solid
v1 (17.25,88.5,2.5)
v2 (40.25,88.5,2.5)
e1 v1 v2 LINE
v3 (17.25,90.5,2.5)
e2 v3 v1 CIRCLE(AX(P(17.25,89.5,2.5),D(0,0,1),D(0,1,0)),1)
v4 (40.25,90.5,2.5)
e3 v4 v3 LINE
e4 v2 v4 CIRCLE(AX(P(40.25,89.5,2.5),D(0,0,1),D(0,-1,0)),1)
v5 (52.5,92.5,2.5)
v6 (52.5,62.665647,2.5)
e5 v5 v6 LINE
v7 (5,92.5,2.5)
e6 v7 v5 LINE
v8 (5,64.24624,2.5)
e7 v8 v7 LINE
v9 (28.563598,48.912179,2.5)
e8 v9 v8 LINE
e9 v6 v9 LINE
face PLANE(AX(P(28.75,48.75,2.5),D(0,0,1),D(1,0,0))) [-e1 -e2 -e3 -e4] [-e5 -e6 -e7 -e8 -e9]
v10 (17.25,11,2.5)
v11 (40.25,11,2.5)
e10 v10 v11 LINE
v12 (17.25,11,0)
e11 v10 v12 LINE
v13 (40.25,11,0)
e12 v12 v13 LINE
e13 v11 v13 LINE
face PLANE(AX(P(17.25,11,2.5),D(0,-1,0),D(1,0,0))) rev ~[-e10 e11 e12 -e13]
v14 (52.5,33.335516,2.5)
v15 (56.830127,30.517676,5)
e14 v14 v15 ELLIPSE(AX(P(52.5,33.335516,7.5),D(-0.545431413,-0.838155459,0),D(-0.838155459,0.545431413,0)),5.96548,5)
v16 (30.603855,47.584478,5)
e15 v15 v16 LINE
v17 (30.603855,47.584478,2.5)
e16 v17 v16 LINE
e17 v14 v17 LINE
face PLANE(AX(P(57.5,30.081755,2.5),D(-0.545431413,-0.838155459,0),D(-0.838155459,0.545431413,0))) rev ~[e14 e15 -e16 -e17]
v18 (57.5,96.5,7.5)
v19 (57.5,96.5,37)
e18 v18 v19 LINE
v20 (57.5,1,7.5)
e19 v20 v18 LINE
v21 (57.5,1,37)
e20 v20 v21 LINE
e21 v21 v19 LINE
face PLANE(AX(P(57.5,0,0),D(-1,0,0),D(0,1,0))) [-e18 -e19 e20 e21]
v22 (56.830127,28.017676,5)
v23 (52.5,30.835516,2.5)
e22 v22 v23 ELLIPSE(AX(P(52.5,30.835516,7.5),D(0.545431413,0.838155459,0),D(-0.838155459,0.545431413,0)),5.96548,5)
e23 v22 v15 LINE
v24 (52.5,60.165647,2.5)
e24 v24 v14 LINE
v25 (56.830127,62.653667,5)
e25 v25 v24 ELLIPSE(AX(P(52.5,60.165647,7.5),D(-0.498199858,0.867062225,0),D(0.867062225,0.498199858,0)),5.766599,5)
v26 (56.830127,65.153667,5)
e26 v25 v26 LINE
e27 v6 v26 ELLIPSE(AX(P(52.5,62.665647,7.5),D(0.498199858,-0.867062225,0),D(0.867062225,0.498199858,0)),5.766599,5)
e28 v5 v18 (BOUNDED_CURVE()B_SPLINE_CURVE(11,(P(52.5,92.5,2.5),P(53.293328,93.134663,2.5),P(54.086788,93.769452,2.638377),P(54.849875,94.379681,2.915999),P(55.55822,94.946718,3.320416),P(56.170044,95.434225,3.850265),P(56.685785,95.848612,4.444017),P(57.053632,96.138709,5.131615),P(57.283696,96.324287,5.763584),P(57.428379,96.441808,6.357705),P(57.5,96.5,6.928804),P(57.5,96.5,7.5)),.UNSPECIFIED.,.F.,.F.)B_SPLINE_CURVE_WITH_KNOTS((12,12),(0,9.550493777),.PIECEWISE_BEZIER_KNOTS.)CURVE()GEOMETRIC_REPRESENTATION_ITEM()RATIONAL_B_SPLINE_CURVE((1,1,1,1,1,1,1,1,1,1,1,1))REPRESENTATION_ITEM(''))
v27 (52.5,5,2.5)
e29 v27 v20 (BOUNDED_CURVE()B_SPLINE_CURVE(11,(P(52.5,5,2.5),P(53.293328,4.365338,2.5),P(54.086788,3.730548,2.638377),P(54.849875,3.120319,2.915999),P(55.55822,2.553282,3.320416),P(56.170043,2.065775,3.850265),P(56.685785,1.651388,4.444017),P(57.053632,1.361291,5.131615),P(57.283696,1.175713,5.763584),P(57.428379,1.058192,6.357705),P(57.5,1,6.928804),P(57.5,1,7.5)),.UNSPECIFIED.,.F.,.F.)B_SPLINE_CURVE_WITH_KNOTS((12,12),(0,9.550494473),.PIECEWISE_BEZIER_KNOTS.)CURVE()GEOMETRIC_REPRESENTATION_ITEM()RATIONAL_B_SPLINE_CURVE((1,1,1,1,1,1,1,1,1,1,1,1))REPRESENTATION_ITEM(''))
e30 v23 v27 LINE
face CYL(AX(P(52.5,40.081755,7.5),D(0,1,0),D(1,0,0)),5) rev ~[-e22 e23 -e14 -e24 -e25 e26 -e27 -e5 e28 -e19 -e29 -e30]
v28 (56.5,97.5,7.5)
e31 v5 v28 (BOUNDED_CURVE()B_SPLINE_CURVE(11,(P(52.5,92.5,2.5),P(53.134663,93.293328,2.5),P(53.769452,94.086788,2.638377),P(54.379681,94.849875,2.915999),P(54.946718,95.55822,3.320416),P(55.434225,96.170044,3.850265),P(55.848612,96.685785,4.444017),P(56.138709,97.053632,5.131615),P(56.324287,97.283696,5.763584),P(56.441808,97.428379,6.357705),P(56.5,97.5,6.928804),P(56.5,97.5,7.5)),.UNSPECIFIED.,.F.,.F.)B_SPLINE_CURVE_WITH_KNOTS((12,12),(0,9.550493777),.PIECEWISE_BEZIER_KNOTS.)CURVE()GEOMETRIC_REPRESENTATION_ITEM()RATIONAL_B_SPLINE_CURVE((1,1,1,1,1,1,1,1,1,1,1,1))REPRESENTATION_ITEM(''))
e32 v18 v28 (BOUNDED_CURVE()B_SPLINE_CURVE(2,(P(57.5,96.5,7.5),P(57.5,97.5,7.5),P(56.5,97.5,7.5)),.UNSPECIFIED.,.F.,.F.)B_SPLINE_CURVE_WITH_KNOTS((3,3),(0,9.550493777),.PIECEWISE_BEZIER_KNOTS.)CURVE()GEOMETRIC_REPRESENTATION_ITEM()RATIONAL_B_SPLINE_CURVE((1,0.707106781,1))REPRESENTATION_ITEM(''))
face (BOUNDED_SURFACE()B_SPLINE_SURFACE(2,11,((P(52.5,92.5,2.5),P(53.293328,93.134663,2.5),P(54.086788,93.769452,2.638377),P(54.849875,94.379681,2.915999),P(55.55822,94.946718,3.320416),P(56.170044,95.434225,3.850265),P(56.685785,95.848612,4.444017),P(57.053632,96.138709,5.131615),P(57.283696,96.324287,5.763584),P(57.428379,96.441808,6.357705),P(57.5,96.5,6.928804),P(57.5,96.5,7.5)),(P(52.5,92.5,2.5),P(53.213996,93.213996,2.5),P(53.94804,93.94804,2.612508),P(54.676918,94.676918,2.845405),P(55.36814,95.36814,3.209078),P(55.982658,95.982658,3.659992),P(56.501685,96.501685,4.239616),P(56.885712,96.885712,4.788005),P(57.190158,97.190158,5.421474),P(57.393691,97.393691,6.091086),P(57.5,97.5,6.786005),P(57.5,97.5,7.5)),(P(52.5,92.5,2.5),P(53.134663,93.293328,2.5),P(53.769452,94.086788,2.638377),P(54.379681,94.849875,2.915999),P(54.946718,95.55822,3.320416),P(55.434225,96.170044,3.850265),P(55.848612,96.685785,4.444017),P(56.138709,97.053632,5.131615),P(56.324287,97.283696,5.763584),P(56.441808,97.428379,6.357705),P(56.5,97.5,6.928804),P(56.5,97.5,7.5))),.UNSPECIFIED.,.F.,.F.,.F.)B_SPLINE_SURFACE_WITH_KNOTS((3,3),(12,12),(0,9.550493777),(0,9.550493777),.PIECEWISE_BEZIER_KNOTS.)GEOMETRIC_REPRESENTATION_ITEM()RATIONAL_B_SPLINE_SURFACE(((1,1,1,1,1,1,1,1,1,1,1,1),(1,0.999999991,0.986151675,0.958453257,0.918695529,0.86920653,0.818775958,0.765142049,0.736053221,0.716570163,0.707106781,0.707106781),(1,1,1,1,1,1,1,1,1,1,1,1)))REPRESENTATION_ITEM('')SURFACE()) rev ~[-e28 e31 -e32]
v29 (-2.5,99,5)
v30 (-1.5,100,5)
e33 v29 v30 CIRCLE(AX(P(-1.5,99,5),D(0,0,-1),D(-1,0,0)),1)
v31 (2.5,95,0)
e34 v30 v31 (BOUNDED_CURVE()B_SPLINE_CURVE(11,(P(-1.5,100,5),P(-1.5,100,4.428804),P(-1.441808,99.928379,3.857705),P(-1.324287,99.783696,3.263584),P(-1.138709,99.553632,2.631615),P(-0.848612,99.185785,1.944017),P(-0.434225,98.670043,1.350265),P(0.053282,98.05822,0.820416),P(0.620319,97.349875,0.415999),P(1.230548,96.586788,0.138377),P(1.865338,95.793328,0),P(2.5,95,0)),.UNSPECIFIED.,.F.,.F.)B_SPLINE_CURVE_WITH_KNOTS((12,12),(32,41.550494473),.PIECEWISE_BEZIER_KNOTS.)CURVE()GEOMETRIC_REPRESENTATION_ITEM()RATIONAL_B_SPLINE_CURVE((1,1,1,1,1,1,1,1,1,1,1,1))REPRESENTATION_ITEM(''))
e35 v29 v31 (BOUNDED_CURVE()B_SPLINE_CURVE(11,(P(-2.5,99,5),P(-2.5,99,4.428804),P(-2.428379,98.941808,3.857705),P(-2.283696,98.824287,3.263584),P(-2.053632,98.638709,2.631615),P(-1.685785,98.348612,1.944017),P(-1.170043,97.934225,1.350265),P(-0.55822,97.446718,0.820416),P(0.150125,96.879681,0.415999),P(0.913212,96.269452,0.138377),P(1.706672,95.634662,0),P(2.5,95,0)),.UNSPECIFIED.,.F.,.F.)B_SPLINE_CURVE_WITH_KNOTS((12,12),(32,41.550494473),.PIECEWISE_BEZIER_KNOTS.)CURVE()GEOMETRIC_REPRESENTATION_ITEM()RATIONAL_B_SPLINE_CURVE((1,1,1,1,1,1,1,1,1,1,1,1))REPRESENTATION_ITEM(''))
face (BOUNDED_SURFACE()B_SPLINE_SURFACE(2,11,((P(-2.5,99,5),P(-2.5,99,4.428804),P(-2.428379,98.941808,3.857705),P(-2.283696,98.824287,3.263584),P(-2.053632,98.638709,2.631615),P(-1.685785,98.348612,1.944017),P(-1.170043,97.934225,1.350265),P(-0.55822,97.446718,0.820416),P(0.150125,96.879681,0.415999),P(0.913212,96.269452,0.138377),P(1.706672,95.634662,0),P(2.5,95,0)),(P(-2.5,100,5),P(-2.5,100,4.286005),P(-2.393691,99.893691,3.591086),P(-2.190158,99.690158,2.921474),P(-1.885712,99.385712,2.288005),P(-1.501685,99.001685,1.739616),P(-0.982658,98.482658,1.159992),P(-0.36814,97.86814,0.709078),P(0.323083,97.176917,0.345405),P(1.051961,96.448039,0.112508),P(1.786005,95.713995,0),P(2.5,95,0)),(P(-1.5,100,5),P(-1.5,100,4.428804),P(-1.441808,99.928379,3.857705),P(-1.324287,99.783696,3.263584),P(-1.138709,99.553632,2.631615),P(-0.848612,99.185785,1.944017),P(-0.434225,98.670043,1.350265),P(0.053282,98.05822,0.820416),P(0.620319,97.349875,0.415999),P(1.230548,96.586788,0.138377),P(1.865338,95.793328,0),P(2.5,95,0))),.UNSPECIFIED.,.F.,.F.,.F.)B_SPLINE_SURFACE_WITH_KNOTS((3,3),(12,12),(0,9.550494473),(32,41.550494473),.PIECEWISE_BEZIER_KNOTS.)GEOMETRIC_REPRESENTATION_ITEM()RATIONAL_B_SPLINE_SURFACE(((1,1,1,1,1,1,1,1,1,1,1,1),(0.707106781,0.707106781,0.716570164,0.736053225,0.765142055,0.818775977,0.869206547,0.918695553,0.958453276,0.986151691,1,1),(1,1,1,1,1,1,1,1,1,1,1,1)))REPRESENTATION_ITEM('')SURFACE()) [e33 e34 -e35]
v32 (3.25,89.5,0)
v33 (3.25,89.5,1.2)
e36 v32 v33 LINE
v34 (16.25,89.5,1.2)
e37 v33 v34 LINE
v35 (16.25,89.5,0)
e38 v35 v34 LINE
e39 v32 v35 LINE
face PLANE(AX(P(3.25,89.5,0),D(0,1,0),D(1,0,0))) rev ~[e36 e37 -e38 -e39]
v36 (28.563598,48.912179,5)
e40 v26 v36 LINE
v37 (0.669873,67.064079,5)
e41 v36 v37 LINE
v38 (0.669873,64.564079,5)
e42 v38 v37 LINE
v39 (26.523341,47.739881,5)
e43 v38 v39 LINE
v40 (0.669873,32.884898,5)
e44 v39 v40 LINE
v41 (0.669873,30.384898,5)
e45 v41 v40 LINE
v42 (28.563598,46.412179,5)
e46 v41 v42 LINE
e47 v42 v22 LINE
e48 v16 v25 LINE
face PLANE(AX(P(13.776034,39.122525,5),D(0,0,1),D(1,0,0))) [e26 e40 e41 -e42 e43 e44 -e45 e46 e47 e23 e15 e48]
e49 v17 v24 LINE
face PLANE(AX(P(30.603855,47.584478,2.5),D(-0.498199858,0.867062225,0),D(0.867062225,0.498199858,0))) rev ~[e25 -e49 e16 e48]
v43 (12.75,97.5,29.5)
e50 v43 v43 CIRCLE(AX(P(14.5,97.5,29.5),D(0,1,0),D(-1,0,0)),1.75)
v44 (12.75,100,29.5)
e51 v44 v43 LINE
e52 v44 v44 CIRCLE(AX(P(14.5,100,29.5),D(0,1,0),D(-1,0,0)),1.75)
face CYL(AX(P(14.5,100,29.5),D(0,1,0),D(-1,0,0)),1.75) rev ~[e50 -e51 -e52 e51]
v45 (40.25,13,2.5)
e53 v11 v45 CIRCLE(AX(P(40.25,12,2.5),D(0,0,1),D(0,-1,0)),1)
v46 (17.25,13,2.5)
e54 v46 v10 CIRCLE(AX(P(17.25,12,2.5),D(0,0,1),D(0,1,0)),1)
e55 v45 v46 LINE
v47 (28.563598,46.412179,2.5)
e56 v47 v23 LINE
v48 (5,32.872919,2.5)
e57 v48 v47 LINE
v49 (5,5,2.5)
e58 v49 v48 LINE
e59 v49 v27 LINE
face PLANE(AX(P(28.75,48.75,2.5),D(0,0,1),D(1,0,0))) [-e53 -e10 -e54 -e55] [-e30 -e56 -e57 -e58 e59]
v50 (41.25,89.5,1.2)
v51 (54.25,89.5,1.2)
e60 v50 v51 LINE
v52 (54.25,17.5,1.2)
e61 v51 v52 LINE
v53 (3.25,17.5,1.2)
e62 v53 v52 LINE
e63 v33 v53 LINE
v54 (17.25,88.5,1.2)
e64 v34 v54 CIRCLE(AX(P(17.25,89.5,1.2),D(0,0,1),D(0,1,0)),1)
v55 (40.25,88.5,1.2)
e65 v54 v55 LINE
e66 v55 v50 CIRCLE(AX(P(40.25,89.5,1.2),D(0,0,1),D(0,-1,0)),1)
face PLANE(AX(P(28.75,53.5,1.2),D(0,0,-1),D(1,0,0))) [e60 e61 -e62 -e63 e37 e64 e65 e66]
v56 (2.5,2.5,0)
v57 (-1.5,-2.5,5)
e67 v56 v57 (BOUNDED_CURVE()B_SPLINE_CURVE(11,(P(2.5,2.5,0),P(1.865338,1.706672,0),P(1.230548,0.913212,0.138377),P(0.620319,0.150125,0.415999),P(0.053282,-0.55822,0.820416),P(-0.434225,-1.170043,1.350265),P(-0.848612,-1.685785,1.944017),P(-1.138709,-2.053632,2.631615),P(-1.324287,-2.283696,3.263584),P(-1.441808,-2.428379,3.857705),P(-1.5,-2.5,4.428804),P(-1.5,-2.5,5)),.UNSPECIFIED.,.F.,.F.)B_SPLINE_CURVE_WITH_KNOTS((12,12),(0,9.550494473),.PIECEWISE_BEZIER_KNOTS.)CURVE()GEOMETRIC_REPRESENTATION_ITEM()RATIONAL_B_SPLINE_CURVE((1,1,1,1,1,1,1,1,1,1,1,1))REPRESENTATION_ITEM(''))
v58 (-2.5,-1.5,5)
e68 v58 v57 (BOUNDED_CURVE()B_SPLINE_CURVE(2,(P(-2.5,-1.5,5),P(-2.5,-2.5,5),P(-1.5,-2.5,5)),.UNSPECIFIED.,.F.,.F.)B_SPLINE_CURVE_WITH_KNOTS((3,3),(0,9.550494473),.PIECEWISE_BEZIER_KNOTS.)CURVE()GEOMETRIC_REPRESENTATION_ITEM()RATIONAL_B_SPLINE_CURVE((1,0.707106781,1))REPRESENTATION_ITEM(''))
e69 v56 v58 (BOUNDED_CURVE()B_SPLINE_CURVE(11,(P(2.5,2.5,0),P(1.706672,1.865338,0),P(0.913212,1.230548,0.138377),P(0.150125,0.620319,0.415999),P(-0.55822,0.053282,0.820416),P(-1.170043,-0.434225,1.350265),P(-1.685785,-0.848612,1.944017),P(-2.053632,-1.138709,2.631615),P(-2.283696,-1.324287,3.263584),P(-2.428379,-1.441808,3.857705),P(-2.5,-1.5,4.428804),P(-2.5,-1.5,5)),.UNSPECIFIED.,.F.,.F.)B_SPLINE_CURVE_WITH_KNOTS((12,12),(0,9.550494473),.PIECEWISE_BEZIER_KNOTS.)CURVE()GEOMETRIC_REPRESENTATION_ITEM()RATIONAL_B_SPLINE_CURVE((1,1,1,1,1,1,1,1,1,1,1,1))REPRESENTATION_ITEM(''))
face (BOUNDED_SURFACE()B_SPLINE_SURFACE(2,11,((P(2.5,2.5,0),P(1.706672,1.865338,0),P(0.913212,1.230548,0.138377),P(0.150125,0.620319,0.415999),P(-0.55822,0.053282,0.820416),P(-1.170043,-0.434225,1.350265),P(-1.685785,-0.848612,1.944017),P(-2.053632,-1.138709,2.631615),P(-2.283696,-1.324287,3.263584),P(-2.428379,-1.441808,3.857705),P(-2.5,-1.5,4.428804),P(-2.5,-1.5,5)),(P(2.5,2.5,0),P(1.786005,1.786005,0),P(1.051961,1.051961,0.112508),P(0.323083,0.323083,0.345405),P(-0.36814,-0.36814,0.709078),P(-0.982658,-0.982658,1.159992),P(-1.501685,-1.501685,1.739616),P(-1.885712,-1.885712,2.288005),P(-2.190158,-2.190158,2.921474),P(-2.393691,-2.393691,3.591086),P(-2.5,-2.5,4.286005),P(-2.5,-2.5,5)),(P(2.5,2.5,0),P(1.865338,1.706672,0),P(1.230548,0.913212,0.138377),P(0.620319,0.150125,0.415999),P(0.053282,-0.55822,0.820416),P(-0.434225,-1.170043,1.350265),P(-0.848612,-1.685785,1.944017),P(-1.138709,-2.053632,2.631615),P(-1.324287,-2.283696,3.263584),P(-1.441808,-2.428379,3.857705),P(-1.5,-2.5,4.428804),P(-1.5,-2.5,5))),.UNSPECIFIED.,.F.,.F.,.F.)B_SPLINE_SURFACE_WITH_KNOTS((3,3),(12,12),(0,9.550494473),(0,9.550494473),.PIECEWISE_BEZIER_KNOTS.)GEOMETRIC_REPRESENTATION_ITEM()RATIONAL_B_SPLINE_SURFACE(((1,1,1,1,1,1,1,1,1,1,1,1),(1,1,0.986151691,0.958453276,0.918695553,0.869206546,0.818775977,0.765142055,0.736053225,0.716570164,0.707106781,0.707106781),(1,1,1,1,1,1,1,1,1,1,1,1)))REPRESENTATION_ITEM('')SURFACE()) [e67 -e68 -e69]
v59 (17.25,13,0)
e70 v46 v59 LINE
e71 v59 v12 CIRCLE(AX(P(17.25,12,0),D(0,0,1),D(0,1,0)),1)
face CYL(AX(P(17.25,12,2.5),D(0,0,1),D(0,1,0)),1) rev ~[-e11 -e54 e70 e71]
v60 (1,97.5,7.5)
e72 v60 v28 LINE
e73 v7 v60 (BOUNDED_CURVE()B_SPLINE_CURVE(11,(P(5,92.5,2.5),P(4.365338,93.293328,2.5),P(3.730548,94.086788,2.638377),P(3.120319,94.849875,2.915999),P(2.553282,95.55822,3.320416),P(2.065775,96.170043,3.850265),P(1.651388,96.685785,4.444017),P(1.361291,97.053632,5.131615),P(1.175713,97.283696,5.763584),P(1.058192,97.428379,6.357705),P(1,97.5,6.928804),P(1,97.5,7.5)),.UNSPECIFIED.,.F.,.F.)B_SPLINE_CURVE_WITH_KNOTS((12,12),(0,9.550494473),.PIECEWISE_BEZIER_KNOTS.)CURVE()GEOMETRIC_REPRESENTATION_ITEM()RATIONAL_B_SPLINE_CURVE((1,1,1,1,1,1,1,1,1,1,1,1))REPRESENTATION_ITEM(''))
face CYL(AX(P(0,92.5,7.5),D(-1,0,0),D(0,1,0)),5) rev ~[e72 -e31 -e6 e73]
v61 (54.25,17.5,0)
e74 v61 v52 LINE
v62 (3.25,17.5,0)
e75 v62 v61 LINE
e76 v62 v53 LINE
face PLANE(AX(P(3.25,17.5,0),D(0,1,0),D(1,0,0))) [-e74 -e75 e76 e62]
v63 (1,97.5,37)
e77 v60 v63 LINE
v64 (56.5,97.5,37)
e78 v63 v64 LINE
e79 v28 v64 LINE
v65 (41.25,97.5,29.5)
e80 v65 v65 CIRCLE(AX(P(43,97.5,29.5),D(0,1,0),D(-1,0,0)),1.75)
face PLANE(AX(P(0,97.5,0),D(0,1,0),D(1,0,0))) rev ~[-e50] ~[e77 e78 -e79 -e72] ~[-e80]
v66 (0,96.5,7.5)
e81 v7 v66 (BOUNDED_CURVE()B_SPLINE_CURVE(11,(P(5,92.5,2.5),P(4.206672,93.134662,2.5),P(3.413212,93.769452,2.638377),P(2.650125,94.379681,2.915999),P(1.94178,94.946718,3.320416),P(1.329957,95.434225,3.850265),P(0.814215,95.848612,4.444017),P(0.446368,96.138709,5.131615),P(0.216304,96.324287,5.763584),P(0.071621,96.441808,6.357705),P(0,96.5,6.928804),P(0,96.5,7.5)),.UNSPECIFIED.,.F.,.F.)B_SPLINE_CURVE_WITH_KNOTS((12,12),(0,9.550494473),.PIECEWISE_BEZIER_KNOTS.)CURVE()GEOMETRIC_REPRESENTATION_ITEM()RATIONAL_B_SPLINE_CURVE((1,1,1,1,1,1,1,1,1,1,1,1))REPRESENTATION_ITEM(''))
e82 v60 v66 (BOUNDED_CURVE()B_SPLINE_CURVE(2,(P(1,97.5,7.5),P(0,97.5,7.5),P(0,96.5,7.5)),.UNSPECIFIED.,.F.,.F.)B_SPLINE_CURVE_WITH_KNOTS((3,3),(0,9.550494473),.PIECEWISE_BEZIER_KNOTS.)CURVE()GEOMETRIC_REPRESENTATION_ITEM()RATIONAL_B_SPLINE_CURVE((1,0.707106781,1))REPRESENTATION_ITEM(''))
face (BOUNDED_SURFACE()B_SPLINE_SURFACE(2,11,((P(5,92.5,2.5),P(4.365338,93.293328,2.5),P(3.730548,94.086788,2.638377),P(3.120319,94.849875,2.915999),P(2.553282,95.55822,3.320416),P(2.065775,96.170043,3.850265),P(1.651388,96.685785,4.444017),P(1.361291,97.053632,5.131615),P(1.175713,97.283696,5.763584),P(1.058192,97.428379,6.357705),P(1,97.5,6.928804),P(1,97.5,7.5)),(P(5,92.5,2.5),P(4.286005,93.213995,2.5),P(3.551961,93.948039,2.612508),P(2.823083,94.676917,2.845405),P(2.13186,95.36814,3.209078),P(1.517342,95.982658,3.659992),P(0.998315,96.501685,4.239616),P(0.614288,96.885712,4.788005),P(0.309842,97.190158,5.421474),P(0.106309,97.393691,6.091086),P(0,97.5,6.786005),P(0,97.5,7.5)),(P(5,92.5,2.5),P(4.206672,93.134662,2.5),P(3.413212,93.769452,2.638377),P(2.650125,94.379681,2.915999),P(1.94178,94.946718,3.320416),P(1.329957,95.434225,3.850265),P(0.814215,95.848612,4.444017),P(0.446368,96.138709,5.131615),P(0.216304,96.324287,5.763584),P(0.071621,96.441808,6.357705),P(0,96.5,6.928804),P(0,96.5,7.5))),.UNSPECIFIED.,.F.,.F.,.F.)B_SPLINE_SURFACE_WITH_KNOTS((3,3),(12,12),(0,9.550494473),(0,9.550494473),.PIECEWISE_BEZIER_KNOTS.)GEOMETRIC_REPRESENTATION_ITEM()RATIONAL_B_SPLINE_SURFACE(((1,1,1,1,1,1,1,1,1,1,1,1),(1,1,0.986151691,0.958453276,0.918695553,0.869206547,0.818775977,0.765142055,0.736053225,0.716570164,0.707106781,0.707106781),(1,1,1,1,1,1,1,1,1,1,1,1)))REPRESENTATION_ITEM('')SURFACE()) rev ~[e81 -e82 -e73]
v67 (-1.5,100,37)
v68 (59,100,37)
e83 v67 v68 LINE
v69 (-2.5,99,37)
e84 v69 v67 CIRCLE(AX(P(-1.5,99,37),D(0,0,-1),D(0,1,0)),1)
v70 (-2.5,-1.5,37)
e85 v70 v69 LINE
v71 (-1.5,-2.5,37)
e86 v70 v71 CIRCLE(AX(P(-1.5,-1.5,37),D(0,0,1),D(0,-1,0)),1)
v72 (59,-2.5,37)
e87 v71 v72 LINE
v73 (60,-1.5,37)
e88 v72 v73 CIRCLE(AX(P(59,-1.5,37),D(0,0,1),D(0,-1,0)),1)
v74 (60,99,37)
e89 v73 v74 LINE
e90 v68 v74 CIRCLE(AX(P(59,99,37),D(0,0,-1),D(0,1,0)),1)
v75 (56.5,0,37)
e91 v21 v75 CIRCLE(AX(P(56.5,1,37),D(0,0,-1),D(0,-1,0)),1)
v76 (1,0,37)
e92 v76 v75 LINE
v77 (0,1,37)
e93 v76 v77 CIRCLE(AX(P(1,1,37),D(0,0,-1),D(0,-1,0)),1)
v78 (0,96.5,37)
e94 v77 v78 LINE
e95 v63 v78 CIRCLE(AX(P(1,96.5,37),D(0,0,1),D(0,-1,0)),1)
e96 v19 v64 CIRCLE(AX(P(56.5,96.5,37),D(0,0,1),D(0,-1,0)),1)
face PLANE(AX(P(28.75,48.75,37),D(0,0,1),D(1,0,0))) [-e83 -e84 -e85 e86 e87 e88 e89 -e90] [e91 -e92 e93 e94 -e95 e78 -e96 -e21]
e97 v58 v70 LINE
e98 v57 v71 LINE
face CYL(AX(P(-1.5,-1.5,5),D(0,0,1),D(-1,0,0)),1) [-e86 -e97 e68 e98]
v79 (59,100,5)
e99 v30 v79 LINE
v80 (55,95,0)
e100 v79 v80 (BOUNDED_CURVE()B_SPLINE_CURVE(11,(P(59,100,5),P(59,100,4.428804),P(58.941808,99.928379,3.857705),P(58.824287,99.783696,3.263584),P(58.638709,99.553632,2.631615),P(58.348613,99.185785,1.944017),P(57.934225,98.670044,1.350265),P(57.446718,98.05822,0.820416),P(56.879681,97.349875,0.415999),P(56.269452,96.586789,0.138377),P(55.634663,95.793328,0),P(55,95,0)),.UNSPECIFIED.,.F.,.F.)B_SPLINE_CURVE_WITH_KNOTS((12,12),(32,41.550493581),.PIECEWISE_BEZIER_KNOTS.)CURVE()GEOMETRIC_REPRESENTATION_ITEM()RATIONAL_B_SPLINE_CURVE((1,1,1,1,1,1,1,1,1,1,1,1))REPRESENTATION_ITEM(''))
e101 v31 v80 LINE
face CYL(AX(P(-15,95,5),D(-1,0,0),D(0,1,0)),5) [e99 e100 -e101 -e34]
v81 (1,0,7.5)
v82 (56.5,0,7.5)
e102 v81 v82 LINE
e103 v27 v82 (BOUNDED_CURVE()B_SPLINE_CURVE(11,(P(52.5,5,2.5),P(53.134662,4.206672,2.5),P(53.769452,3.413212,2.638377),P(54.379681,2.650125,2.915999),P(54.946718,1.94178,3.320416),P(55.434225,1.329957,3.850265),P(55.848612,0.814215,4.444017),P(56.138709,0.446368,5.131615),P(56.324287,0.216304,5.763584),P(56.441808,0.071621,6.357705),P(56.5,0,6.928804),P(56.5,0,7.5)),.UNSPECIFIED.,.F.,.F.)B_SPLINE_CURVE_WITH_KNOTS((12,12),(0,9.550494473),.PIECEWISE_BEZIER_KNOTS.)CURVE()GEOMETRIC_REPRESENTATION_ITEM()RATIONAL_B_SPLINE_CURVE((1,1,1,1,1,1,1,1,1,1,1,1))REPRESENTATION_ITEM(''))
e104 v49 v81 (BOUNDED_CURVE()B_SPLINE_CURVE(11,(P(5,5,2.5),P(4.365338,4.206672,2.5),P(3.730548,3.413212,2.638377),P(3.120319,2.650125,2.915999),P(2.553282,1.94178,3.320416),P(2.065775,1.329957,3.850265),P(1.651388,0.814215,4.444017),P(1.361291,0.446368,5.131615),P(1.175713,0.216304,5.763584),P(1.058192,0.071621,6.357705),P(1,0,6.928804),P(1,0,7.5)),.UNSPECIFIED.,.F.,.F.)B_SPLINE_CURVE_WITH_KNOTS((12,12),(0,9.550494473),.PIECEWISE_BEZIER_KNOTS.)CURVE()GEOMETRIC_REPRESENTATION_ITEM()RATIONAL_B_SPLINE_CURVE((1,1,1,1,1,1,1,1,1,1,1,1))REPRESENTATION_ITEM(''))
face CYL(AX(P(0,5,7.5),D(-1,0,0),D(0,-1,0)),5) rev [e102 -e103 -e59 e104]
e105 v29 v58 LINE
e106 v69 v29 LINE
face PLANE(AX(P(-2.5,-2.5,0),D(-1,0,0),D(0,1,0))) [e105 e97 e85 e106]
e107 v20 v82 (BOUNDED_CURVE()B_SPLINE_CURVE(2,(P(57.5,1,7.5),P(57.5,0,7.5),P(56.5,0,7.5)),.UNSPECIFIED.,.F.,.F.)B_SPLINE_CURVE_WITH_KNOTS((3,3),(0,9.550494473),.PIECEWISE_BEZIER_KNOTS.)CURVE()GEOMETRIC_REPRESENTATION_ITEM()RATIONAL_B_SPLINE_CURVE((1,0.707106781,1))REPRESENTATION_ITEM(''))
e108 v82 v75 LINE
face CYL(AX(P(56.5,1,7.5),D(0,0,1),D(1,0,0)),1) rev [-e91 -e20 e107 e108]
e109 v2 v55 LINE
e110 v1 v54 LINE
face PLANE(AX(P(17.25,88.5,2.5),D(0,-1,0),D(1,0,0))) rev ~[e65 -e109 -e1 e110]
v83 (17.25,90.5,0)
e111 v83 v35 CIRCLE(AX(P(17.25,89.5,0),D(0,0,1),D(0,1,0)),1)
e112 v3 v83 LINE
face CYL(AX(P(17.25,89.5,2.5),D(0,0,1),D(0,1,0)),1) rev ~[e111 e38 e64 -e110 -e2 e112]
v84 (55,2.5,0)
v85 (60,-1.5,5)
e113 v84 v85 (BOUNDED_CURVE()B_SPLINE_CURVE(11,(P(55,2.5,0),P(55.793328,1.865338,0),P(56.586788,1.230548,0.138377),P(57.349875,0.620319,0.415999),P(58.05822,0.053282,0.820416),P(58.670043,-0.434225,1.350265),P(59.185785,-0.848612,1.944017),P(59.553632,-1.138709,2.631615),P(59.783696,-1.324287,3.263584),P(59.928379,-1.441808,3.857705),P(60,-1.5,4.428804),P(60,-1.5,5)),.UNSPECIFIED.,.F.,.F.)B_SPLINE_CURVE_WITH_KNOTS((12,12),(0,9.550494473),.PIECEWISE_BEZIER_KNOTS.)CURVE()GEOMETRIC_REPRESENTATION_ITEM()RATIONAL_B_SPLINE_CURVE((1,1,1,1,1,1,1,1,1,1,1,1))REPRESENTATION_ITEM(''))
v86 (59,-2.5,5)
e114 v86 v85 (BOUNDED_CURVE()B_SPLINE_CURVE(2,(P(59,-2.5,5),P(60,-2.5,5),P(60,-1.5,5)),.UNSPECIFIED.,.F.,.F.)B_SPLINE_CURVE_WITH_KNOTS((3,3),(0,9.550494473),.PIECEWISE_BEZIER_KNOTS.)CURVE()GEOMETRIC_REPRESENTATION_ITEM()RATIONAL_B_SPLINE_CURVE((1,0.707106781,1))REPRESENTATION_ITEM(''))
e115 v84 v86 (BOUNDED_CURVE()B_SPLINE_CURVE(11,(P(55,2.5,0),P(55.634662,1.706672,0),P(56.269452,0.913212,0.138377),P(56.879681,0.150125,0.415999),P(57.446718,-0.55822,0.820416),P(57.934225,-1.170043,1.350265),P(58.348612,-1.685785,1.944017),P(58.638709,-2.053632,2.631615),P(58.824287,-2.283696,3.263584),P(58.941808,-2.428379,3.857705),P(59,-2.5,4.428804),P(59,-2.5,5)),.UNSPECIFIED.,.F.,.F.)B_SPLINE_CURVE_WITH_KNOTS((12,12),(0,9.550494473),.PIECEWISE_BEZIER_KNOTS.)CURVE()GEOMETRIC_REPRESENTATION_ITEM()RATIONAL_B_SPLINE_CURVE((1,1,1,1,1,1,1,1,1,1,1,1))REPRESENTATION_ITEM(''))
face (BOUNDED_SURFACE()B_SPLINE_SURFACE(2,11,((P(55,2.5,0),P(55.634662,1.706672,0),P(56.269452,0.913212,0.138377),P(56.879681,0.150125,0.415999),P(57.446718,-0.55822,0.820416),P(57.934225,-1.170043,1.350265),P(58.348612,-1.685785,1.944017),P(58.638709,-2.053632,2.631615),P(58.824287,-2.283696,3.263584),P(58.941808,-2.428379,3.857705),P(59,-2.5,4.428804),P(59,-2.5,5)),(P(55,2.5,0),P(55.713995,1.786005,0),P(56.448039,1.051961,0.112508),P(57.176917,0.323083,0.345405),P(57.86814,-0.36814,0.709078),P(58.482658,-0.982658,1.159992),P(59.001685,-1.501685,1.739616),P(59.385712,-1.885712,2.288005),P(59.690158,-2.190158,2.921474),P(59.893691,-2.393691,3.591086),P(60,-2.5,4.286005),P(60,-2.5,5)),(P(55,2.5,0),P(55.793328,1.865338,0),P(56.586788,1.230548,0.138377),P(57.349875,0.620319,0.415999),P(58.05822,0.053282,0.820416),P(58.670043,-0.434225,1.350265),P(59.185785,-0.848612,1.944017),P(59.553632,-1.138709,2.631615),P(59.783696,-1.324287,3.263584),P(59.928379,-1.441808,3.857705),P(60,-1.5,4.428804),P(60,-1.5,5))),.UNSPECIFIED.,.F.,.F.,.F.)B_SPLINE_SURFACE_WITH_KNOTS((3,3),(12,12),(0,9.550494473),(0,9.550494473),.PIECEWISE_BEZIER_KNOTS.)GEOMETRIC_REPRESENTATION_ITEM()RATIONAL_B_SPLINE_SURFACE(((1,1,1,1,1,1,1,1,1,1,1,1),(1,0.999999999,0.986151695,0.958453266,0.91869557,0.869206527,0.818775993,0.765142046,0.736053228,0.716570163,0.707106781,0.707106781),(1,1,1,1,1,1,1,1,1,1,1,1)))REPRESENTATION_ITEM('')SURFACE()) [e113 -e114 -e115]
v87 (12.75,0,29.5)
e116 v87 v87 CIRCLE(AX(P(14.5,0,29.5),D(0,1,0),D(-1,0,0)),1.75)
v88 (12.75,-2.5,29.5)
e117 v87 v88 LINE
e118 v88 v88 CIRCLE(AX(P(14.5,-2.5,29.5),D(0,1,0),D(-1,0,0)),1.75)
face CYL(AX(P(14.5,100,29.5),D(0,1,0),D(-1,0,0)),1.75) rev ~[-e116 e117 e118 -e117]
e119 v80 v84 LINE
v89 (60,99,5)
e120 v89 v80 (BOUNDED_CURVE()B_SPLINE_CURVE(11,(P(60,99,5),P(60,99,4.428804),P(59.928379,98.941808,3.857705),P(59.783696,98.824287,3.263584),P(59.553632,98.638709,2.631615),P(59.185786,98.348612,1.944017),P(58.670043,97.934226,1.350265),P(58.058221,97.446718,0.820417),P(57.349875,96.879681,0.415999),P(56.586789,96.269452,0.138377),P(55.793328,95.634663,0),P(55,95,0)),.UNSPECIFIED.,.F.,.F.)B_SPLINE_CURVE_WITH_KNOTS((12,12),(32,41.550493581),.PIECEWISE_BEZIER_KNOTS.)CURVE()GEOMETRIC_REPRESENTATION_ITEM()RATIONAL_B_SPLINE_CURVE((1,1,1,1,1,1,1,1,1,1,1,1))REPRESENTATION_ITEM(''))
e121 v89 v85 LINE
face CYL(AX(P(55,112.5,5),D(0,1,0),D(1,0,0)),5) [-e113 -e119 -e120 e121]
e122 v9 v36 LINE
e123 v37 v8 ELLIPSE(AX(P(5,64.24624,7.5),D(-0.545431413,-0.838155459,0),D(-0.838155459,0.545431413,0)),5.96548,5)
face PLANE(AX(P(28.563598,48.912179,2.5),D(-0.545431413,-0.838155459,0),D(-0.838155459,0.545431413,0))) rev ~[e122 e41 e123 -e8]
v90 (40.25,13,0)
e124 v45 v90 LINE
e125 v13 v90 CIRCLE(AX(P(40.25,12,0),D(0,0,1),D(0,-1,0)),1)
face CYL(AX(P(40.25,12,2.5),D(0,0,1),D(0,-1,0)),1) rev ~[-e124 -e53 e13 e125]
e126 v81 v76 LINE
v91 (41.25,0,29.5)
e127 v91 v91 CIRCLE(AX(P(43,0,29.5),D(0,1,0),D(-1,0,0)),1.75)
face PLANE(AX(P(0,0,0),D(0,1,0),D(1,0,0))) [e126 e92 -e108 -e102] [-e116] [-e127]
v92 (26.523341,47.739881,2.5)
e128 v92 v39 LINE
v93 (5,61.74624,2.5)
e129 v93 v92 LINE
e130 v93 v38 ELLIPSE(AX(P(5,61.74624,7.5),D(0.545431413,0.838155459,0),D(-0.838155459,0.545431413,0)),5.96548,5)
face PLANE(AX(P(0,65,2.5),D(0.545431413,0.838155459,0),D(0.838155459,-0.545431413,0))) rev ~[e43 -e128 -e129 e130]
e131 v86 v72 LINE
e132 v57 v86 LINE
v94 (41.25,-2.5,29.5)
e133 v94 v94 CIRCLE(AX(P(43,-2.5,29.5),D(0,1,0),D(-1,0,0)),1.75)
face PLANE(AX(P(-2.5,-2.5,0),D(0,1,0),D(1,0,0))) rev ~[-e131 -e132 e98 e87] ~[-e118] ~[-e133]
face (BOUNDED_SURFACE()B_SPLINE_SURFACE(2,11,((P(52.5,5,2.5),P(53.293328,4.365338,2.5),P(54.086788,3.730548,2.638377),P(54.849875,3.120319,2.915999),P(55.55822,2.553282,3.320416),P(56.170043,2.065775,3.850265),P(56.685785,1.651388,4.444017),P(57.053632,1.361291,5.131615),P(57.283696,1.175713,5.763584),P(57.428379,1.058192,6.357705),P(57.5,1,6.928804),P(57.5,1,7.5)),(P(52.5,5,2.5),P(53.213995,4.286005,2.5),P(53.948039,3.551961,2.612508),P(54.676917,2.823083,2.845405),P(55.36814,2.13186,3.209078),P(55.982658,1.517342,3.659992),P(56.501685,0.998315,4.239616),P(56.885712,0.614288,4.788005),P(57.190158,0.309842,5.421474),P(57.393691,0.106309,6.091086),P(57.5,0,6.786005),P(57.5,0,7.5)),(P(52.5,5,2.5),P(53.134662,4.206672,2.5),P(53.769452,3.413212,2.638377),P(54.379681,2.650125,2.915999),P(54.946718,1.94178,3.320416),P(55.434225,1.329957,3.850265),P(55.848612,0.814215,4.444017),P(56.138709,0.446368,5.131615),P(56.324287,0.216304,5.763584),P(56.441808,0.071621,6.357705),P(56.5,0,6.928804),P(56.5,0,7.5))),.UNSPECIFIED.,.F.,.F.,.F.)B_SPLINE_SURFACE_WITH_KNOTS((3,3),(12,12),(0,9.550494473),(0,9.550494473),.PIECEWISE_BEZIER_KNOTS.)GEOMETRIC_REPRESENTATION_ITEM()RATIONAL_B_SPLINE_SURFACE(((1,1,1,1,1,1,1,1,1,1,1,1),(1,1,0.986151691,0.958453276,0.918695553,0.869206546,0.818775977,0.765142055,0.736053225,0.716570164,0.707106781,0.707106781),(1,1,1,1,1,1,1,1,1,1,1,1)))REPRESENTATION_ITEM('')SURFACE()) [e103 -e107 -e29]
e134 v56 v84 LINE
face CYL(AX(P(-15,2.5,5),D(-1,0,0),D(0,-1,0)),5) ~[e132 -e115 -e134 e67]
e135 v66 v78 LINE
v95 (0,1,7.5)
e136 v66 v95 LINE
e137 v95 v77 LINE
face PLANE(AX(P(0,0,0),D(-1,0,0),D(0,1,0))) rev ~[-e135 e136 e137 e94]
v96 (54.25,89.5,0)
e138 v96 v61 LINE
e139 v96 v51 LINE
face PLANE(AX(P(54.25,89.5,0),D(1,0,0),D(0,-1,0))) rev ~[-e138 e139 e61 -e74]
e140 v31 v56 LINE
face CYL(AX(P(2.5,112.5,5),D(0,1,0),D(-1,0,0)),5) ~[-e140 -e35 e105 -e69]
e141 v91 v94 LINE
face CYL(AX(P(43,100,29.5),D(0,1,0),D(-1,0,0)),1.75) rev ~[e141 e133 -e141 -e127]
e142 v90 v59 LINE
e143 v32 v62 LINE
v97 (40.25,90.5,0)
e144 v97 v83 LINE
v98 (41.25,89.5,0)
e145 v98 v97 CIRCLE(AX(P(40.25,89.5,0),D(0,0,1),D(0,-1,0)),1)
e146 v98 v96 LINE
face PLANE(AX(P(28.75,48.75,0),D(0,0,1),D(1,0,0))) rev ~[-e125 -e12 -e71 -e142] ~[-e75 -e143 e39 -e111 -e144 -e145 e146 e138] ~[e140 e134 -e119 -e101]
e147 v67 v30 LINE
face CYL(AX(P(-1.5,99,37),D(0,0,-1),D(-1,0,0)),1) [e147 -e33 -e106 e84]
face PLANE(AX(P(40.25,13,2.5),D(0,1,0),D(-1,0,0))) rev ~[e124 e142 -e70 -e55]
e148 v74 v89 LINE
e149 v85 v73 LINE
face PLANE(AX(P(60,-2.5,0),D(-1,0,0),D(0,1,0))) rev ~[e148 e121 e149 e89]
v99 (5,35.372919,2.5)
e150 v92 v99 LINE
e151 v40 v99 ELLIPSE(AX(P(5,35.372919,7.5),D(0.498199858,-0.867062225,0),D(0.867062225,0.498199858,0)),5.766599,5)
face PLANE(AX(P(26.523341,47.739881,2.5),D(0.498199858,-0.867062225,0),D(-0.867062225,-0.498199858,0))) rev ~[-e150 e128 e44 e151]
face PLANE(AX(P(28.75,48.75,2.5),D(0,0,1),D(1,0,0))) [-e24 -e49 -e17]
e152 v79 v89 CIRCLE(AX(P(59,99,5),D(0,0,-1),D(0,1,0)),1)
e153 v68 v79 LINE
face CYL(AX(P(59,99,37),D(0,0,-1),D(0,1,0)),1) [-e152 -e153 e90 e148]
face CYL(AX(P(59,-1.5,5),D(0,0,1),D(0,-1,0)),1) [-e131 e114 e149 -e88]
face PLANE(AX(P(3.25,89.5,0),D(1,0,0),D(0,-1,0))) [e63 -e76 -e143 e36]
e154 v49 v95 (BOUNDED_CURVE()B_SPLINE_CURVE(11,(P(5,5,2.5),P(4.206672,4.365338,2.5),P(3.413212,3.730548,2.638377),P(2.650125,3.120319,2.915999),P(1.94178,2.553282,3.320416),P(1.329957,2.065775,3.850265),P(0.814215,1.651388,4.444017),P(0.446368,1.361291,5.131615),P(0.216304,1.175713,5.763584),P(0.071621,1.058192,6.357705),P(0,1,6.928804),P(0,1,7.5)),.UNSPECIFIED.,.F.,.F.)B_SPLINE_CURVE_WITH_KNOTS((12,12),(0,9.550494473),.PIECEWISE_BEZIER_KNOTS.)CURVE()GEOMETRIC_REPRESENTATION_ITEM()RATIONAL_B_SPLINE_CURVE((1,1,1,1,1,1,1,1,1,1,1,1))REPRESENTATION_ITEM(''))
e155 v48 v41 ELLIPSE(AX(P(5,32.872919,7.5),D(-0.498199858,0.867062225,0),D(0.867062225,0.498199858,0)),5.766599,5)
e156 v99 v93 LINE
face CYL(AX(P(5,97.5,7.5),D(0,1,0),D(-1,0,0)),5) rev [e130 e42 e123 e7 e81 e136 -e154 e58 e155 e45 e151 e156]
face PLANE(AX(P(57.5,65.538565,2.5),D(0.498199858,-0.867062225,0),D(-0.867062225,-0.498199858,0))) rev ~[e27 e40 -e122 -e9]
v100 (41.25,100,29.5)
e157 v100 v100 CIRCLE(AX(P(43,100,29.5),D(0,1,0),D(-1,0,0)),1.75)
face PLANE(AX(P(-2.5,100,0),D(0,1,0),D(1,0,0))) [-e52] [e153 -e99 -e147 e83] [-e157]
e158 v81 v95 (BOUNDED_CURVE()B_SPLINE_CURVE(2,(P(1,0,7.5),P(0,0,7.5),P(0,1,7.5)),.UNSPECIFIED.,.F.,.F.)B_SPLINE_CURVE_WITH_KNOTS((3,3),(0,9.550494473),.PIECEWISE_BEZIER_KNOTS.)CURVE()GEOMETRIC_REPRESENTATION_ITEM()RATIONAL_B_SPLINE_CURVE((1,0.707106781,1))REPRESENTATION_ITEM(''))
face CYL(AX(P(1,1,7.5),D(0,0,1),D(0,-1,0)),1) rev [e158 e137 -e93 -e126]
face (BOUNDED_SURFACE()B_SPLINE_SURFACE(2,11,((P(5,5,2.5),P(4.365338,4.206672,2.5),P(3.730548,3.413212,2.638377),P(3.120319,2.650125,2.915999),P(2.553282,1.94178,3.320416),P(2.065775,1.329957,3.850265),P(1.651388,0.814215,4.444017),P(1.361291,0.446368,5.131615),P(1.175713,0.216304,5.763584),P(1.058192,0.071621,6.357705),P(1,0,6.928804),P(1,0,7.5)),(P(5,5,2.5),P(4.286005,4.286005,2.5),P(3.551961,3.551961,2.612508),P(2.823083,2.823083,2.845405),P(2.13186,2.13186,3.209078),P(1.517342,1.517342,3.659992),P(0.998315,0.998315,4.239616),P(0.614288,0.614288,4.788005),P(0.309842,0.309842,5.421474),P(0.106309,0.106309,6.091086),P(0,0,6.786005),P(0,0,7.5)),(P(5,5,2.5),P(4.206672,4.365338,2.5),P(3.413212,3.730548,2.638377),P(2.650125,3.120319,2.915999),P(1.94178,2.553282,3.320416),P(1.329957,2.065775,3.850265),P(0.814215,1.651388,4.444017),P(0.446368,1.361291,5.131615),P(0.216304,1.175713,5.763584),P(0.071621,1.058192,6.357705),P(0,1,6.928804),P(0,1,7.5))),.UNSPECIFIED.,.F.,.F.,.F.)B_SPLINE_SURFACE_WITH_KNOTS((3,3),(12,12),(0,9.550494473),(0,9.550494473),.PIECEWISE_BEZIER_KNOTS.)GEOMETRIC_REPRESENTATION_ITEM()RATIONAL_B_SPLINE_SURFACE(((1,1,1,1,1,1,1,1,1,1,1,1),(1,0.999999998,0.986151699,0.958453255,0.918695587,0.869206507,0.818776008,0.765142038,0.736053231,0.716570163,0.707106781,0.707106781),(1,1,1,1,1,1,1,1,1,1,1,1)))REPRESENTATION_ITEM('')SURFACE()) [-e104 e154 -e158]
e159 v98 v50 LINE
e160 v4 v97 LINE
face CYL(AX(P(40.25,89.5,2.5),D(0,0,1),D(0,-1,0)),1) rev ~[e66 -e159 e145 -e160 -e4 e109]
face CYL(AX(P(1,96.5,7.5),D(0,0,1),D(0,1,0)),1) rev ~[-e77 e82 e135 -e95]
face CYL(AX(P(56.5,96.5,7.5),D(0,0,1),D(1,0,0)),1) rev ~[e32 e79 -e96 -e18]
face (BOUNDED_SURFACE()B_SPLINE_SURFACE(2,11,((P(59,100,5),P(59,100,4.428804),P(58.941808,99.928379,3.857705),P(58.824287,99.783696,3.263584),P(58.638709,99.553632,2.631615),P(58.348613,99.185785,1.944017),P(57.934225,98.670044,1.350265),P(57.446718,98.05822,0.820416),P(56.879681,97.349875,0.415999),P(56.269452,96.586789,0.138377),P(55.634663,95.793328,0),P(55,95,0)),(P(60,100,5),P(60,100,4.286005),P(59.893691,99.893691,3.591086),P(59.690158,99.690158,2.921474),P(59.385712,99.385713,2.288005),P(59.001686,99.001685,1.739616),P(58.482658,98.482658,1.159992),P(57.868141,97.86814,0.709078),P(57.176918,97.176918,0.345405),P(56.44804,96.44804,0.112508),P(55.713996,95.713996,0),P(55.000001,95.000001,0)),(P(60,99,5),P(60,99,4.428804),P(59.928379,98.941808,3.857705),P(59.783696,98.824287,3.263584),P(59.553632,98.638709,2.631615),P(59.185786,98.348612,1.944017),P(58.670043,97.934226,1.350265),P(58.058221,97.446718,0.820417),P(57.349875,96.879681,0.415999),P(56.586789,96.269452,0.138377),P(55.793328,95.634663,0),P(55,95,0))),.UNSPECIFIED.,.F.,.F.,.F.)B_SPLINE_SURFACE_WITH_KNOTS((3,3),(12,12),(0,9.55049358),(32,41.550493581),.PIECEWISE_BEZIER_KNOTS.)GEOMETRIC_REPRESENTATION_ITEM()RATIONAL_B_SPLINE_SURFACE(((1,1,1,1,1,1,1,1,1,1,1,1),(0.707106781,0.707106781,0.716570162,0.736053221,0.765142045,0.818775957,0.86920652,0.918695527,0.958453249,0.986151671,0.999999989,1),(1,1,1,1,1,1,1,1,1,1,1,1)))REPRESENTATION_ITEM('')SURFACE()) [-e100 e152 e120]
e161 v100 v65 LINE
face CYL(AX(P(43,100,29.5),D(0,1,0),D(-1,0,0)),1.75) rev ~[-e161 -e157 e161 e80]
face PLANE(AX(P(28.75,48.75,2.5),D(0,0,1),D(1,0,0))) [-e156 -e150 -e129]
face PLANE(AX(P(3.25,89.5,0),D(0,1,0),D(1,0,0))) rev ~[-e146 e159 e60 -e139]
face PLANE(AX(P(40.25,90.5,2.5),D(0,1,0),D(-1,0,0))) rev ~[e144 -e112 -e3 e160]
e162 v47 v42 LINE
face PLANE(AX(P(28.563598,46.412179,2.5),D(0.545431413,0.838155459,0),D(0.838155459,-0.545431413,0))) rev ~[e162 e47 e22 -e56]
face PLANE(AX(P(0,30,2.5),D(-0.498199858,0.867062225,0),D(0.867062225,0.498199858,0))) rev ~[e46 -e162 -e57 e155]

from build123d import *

# Parameters (mm, degrees)
F1_W          = 62.5
F1_H          = 102.5
F1_W_2        = 57.5
F1_H_2        = 97.5
F2_DEPTH      = 37
F3_W          = 62.5
F3_H          = 102.5
F4_DEPTH      = 2.5
F6_DEPTH      = 2.501
F7_W          = 51
F7_H          = 72
F8_DEPTH      = 1.2
F10_DEPTH     = 2.5
F11_R         = 1.75
F12_DEPTH     = 102.501
F13_T1_DEPTH  = 42.5
F13_T3_DEPTH  = 57.5
F13_T5_DEPTH  = 42.5
F13_T7_DEPTH  = 57.5
F13_T9_DEPTH  = 44.4614347816
F13_T11_DEPTH = 57.9568101466
F13_T13_DEPTH = 40.0817550719
F13_T15_DEPTH = 127.5
F13_T17_DEPTH = 87.5
F14_R         = 1


# Not quite as in the source:
# - a fillet or chamfer that OpenCascade refuses, or shapes differently, is made with other operations: its cross-section is extruded or revolved along the edge and cut away or added


with BuildPart() as f2:
    # F1 (on Top) → F2 (new body)
    with BuildSketch(Plane.XY):
        with Locations((28.75, 48.75)):
            Rectangle(F1_W, F1_H)
        with Locations((28.75, 48.75)):
            Rectangle(F1_W_2, F1_H_2, mode=Mode.SUBTRACT)
    extrude(amount=F2_DEPTH)

    # F3 (on Top) → F4 (join)
    with BuildSketch(Plane.XY):
        with Locations((28.75, 48.75)):
            Rectangle(F3_W, F3_H)
    extrude(amount=F4_DEPTH)

    # F5 (on face) → F6 (cut, through all)
    with BuildSketch(Plane.XY.offset(2.5)):
        with BuildLine():
            ThreePointArc((17.25, 90.5), (16.25, 89.5), (17.25, 88.5))
            Line((17.25, 88.5), (40.25, 88.5))
            ThreePointArc((40.25, 88.5), (41.25, 89.5), (40.25, 90.5))
            Line((40.25, 90.5), (17.25, 90.5))
        make_face()
        with BuildLine():
            ThreePointArc((17.25, 13), (16.25, 12), (17.25, 11))
            Line((17.25, 11), (40.25, 11))
            ThreePointArc((40.25, 11), (41.25, 12), (40.25, 13))
            Line((40.25, 13), (17.25, 13))
        make_face()
    extrude(amount=-F6_DEPTH, mode=Mode.SUBTRACT)

    # F7 (on face) → F8 (cut)
    with BuildSketch(Plane(origin=(0, 0, 0), x_dir=(1, 0, 0), z_dir=(0, 0, -1))):
        with Locations((28.75, -53.5)):
            Rectangle(F7_W, F7_H)
    extrude(amount=-F8_DEPTH, mode=Mode.SUBTRACT)

    # F9 (on face) → F10 (join)
    with BuildSketch(Plane.XY.offset(2.5)):
        Polygon((0, 32.5), (0, 30), (28.5635979803, 46.412179039), (26.5233409817, 47.7398805363), align=None)
        Polygon((26.5233409817, 47.7398805363), (28.5635979803, 46.412179039), (30.6038549789, 47.5844775418), (28.5635979803, 48.912179039), align=None)
        Polygon((30.6038549789, 47.5844775418), (28.5635979803, 46.412179039), (57.5, 27.5817550719), (57.5, 30.0817550719), align=None)
        Polygon((28.5635979803, 48.912179039), (30.6038549789, 47.5844775418), (57.5, 63.0385652184), (57.5, 65.5385652184), align=None)
        Polygon((0, 65), (26.5233409817, 47.7398805363), (28.5635979803, 48.912179039), (0, 67.5), align=None)
    extrude(amount=F10_DEPTH)

    # F11 (on face) → F12 (cut, through all)
    with BuildSketch(Plane(origin=(0, 100, 0), x_dir=(-1, 0, 0), z_dir=(0, 1, 0))):
        with Locations((-14.5, 29.5)):
            Circle(F11_R)
        with Locations((-43, 29.5)):
            Circle(F11_R)
    extrude(amount=-F12_DEPTH, mode=Mode.SUBTRACT)

    # F13: fillet of radius 5 on 12 edges, made by hand

    # F13_s2 → F13_t1 (join)
    with BuildSketch(Plane.XZ.offset(-42.5)):
        with BuildLine():
            ThreePointArc((0, 7.5), (1.4644660941, 3.9644660941), (5, 2.5))
            Line((5, 2.5), (0, 2.5))
            Line((0, 2.5), (0, 7.5))
        make_face()
    extrude(amount=F13_T1_DEPTH)

    # F13_s4 → F13_t3 (join)
    with BuildSketch(Plane.XZ.offset(-77.5)):
        with BuildLine():
            ThreePointArc((0, 7.5), (1.4644660941, 3.9644660941), (5, 2.5))
            Line((5, 2.5), (0, 2.5))
            Line((0, 2.5), (0, 7.5))
        make_face()
    extrude(amount=F13_T3_DEPTH)

    # F13_s6 → F13_t5 (join)
    with BuildSketch(Plane.XZ.offset(-97.5)):
        with BuildLine():
            ThreePointArc((0, 7.5), (1.4644660941, 3.9644660941), (5, 2.5))
            Line((5, 2.5), (0, 2.5))
            Line((0, 2.5), (0, 7.5))
        make_face()
    extrude(amount=F13_T5_DEPTH)

    # F13_s8 → F13_t7 (join)
    with BuildSketch(Plane.YZ):
        with BuildLine():
            ThreePointArc((0, 7.5), (1.4644660941, 3.9644660941), (5, 2.5))
            Line((5, 2.5), (0, 2.5))
            Line((0, 2.5), (0, 7.5))
        make_face()
        with BuildLine():
            ThreePointArc((97.5, 7.5), (96.0355339059, 3.9644660941), (92.5, 2.5))
            Line((92.5, 2.5), (97.5, 2.5))
            Line((97.5, 2.5), (97.5, 7.5))
        make_face()
    extrude(amount=F13_T7_DEPTH)

    # F13_s10 → F13_t9 (join)
    with BuildSketch(Plane.XZ.offset(-97.5)):
        with BuildLine():
            ThreePointArc((57.5, 7.5), (56.0355339059, 3.9644660941), (52.5, 2.5))
            Line((52.5, 2.5), (57.5, 2.5))
            Line((57.5, 2.5), (57.5, 7.5))
        make_face()
    extrude(amount=F13_T9_DEPTH)

    # F13_s12 → F13_t11 (join)
    with BuildSketch(Plane.XZ.offset(-75.5385652184)):
        with BuildLine():
            ThreePointArc((57.5, 7.5), (56.0355339059, 3.9644660941), (52.5, 2.5))
            Line((52.5, 2.5), (57.5, 2.5))
            Line((57.5, 2.5), (57.5, 7.5))
        make_face()
    extrude(amount=F13_T11_DEPTH)

    # F13_s14 → F13_t13 (join)
    with BuildSketch(Plane.XZ.offset(-40.0817550719)):
        with BuildLine():
            ThreePointArc((57.5, 7.5), (56.0355339059, 3.9644660941), (52.5, 2.5))
            Line((52.5, 2.5), (57.5, 2.5))
            Line((57.5, 2.5), (57.5, 7.5))
        make_face()
    extrude(amount=F13_T13_DEPTH)

    # F13_s16 → F13_t15 (cut)
    with BuildSketch(Plane.XZ.offset(-112.5)):
        with BuildLine():
            ThreePointArc((-2.5, 5), (-1.0355339059, 1.4644660941), (2.5, 0))
            Line((2.5, 0), (-2.5, 0))
            Line((-2.5, 0), (-2.5, 5))
        make_face()
        with BuildLine():
            ThreePointArc((60, 5), (58.5355339059, 1.4644660941), (55, 0))
            Line((55, 0), (60, 0))
            Line((60, 0), (60, 5))
        make_face()
    extrude(amount=F13_T15_DEPTH, mode=Mode.SUBTRACT)

    # F13_s18 → F13_t17 (cut)
    with BuildSketch(Plane.YZ.offset(-15)):
        with BuildLine():
            ThreePointArc((100, 5), (98.5355339059, 1.4644660941), (95, 0))
            Line((95, 0), (100, 0))
            Line((100, 0), (100, 5))
        make_face()
        with BuildLine():
            ThreePointArc((-2.5, 5), (-1.0355339059, 1.4644660941), (2.5, 0))
            Line((2.5, 0), (-2.5, 0))
            Line((-2.5, 0), (-2.5, 5))
        make_face()
    extrude(amount=F13_T17_DEPTH, mode=Mode.SUBTRACT)

    # F14
    f14_edges = [f2.edges().sort_by_distance(p)[0] for p in [
        (60, 100, 21),
        (-2.5, 100, 21),
        (-2.5, -2.5, 21),
        (60, -2.5, 21),
        (0, 0, 22.25),
        (57.5, 0, 22.25),
        (57.5, 97.5, 22.25),
        (0, 97.5, 22.25),
        (-1.035534, 98.535534, 1.464466),
        (58.535534, 98.535534, 1.464466),
        (-1.035534, -1.035534, 1.464466),
        (58.535534, -1.035534, 1.464466),
        (56.035534, 1.464466, 3.964466),
        (1.464466, 1.464466, 3.964466),
        (1.464466, 96.035534, 3.964466),
        (56.035534, 96.035534, 3.964466),
    ]]
    fillet(f14_edges, radius=F14_R)


solid = f2.part
